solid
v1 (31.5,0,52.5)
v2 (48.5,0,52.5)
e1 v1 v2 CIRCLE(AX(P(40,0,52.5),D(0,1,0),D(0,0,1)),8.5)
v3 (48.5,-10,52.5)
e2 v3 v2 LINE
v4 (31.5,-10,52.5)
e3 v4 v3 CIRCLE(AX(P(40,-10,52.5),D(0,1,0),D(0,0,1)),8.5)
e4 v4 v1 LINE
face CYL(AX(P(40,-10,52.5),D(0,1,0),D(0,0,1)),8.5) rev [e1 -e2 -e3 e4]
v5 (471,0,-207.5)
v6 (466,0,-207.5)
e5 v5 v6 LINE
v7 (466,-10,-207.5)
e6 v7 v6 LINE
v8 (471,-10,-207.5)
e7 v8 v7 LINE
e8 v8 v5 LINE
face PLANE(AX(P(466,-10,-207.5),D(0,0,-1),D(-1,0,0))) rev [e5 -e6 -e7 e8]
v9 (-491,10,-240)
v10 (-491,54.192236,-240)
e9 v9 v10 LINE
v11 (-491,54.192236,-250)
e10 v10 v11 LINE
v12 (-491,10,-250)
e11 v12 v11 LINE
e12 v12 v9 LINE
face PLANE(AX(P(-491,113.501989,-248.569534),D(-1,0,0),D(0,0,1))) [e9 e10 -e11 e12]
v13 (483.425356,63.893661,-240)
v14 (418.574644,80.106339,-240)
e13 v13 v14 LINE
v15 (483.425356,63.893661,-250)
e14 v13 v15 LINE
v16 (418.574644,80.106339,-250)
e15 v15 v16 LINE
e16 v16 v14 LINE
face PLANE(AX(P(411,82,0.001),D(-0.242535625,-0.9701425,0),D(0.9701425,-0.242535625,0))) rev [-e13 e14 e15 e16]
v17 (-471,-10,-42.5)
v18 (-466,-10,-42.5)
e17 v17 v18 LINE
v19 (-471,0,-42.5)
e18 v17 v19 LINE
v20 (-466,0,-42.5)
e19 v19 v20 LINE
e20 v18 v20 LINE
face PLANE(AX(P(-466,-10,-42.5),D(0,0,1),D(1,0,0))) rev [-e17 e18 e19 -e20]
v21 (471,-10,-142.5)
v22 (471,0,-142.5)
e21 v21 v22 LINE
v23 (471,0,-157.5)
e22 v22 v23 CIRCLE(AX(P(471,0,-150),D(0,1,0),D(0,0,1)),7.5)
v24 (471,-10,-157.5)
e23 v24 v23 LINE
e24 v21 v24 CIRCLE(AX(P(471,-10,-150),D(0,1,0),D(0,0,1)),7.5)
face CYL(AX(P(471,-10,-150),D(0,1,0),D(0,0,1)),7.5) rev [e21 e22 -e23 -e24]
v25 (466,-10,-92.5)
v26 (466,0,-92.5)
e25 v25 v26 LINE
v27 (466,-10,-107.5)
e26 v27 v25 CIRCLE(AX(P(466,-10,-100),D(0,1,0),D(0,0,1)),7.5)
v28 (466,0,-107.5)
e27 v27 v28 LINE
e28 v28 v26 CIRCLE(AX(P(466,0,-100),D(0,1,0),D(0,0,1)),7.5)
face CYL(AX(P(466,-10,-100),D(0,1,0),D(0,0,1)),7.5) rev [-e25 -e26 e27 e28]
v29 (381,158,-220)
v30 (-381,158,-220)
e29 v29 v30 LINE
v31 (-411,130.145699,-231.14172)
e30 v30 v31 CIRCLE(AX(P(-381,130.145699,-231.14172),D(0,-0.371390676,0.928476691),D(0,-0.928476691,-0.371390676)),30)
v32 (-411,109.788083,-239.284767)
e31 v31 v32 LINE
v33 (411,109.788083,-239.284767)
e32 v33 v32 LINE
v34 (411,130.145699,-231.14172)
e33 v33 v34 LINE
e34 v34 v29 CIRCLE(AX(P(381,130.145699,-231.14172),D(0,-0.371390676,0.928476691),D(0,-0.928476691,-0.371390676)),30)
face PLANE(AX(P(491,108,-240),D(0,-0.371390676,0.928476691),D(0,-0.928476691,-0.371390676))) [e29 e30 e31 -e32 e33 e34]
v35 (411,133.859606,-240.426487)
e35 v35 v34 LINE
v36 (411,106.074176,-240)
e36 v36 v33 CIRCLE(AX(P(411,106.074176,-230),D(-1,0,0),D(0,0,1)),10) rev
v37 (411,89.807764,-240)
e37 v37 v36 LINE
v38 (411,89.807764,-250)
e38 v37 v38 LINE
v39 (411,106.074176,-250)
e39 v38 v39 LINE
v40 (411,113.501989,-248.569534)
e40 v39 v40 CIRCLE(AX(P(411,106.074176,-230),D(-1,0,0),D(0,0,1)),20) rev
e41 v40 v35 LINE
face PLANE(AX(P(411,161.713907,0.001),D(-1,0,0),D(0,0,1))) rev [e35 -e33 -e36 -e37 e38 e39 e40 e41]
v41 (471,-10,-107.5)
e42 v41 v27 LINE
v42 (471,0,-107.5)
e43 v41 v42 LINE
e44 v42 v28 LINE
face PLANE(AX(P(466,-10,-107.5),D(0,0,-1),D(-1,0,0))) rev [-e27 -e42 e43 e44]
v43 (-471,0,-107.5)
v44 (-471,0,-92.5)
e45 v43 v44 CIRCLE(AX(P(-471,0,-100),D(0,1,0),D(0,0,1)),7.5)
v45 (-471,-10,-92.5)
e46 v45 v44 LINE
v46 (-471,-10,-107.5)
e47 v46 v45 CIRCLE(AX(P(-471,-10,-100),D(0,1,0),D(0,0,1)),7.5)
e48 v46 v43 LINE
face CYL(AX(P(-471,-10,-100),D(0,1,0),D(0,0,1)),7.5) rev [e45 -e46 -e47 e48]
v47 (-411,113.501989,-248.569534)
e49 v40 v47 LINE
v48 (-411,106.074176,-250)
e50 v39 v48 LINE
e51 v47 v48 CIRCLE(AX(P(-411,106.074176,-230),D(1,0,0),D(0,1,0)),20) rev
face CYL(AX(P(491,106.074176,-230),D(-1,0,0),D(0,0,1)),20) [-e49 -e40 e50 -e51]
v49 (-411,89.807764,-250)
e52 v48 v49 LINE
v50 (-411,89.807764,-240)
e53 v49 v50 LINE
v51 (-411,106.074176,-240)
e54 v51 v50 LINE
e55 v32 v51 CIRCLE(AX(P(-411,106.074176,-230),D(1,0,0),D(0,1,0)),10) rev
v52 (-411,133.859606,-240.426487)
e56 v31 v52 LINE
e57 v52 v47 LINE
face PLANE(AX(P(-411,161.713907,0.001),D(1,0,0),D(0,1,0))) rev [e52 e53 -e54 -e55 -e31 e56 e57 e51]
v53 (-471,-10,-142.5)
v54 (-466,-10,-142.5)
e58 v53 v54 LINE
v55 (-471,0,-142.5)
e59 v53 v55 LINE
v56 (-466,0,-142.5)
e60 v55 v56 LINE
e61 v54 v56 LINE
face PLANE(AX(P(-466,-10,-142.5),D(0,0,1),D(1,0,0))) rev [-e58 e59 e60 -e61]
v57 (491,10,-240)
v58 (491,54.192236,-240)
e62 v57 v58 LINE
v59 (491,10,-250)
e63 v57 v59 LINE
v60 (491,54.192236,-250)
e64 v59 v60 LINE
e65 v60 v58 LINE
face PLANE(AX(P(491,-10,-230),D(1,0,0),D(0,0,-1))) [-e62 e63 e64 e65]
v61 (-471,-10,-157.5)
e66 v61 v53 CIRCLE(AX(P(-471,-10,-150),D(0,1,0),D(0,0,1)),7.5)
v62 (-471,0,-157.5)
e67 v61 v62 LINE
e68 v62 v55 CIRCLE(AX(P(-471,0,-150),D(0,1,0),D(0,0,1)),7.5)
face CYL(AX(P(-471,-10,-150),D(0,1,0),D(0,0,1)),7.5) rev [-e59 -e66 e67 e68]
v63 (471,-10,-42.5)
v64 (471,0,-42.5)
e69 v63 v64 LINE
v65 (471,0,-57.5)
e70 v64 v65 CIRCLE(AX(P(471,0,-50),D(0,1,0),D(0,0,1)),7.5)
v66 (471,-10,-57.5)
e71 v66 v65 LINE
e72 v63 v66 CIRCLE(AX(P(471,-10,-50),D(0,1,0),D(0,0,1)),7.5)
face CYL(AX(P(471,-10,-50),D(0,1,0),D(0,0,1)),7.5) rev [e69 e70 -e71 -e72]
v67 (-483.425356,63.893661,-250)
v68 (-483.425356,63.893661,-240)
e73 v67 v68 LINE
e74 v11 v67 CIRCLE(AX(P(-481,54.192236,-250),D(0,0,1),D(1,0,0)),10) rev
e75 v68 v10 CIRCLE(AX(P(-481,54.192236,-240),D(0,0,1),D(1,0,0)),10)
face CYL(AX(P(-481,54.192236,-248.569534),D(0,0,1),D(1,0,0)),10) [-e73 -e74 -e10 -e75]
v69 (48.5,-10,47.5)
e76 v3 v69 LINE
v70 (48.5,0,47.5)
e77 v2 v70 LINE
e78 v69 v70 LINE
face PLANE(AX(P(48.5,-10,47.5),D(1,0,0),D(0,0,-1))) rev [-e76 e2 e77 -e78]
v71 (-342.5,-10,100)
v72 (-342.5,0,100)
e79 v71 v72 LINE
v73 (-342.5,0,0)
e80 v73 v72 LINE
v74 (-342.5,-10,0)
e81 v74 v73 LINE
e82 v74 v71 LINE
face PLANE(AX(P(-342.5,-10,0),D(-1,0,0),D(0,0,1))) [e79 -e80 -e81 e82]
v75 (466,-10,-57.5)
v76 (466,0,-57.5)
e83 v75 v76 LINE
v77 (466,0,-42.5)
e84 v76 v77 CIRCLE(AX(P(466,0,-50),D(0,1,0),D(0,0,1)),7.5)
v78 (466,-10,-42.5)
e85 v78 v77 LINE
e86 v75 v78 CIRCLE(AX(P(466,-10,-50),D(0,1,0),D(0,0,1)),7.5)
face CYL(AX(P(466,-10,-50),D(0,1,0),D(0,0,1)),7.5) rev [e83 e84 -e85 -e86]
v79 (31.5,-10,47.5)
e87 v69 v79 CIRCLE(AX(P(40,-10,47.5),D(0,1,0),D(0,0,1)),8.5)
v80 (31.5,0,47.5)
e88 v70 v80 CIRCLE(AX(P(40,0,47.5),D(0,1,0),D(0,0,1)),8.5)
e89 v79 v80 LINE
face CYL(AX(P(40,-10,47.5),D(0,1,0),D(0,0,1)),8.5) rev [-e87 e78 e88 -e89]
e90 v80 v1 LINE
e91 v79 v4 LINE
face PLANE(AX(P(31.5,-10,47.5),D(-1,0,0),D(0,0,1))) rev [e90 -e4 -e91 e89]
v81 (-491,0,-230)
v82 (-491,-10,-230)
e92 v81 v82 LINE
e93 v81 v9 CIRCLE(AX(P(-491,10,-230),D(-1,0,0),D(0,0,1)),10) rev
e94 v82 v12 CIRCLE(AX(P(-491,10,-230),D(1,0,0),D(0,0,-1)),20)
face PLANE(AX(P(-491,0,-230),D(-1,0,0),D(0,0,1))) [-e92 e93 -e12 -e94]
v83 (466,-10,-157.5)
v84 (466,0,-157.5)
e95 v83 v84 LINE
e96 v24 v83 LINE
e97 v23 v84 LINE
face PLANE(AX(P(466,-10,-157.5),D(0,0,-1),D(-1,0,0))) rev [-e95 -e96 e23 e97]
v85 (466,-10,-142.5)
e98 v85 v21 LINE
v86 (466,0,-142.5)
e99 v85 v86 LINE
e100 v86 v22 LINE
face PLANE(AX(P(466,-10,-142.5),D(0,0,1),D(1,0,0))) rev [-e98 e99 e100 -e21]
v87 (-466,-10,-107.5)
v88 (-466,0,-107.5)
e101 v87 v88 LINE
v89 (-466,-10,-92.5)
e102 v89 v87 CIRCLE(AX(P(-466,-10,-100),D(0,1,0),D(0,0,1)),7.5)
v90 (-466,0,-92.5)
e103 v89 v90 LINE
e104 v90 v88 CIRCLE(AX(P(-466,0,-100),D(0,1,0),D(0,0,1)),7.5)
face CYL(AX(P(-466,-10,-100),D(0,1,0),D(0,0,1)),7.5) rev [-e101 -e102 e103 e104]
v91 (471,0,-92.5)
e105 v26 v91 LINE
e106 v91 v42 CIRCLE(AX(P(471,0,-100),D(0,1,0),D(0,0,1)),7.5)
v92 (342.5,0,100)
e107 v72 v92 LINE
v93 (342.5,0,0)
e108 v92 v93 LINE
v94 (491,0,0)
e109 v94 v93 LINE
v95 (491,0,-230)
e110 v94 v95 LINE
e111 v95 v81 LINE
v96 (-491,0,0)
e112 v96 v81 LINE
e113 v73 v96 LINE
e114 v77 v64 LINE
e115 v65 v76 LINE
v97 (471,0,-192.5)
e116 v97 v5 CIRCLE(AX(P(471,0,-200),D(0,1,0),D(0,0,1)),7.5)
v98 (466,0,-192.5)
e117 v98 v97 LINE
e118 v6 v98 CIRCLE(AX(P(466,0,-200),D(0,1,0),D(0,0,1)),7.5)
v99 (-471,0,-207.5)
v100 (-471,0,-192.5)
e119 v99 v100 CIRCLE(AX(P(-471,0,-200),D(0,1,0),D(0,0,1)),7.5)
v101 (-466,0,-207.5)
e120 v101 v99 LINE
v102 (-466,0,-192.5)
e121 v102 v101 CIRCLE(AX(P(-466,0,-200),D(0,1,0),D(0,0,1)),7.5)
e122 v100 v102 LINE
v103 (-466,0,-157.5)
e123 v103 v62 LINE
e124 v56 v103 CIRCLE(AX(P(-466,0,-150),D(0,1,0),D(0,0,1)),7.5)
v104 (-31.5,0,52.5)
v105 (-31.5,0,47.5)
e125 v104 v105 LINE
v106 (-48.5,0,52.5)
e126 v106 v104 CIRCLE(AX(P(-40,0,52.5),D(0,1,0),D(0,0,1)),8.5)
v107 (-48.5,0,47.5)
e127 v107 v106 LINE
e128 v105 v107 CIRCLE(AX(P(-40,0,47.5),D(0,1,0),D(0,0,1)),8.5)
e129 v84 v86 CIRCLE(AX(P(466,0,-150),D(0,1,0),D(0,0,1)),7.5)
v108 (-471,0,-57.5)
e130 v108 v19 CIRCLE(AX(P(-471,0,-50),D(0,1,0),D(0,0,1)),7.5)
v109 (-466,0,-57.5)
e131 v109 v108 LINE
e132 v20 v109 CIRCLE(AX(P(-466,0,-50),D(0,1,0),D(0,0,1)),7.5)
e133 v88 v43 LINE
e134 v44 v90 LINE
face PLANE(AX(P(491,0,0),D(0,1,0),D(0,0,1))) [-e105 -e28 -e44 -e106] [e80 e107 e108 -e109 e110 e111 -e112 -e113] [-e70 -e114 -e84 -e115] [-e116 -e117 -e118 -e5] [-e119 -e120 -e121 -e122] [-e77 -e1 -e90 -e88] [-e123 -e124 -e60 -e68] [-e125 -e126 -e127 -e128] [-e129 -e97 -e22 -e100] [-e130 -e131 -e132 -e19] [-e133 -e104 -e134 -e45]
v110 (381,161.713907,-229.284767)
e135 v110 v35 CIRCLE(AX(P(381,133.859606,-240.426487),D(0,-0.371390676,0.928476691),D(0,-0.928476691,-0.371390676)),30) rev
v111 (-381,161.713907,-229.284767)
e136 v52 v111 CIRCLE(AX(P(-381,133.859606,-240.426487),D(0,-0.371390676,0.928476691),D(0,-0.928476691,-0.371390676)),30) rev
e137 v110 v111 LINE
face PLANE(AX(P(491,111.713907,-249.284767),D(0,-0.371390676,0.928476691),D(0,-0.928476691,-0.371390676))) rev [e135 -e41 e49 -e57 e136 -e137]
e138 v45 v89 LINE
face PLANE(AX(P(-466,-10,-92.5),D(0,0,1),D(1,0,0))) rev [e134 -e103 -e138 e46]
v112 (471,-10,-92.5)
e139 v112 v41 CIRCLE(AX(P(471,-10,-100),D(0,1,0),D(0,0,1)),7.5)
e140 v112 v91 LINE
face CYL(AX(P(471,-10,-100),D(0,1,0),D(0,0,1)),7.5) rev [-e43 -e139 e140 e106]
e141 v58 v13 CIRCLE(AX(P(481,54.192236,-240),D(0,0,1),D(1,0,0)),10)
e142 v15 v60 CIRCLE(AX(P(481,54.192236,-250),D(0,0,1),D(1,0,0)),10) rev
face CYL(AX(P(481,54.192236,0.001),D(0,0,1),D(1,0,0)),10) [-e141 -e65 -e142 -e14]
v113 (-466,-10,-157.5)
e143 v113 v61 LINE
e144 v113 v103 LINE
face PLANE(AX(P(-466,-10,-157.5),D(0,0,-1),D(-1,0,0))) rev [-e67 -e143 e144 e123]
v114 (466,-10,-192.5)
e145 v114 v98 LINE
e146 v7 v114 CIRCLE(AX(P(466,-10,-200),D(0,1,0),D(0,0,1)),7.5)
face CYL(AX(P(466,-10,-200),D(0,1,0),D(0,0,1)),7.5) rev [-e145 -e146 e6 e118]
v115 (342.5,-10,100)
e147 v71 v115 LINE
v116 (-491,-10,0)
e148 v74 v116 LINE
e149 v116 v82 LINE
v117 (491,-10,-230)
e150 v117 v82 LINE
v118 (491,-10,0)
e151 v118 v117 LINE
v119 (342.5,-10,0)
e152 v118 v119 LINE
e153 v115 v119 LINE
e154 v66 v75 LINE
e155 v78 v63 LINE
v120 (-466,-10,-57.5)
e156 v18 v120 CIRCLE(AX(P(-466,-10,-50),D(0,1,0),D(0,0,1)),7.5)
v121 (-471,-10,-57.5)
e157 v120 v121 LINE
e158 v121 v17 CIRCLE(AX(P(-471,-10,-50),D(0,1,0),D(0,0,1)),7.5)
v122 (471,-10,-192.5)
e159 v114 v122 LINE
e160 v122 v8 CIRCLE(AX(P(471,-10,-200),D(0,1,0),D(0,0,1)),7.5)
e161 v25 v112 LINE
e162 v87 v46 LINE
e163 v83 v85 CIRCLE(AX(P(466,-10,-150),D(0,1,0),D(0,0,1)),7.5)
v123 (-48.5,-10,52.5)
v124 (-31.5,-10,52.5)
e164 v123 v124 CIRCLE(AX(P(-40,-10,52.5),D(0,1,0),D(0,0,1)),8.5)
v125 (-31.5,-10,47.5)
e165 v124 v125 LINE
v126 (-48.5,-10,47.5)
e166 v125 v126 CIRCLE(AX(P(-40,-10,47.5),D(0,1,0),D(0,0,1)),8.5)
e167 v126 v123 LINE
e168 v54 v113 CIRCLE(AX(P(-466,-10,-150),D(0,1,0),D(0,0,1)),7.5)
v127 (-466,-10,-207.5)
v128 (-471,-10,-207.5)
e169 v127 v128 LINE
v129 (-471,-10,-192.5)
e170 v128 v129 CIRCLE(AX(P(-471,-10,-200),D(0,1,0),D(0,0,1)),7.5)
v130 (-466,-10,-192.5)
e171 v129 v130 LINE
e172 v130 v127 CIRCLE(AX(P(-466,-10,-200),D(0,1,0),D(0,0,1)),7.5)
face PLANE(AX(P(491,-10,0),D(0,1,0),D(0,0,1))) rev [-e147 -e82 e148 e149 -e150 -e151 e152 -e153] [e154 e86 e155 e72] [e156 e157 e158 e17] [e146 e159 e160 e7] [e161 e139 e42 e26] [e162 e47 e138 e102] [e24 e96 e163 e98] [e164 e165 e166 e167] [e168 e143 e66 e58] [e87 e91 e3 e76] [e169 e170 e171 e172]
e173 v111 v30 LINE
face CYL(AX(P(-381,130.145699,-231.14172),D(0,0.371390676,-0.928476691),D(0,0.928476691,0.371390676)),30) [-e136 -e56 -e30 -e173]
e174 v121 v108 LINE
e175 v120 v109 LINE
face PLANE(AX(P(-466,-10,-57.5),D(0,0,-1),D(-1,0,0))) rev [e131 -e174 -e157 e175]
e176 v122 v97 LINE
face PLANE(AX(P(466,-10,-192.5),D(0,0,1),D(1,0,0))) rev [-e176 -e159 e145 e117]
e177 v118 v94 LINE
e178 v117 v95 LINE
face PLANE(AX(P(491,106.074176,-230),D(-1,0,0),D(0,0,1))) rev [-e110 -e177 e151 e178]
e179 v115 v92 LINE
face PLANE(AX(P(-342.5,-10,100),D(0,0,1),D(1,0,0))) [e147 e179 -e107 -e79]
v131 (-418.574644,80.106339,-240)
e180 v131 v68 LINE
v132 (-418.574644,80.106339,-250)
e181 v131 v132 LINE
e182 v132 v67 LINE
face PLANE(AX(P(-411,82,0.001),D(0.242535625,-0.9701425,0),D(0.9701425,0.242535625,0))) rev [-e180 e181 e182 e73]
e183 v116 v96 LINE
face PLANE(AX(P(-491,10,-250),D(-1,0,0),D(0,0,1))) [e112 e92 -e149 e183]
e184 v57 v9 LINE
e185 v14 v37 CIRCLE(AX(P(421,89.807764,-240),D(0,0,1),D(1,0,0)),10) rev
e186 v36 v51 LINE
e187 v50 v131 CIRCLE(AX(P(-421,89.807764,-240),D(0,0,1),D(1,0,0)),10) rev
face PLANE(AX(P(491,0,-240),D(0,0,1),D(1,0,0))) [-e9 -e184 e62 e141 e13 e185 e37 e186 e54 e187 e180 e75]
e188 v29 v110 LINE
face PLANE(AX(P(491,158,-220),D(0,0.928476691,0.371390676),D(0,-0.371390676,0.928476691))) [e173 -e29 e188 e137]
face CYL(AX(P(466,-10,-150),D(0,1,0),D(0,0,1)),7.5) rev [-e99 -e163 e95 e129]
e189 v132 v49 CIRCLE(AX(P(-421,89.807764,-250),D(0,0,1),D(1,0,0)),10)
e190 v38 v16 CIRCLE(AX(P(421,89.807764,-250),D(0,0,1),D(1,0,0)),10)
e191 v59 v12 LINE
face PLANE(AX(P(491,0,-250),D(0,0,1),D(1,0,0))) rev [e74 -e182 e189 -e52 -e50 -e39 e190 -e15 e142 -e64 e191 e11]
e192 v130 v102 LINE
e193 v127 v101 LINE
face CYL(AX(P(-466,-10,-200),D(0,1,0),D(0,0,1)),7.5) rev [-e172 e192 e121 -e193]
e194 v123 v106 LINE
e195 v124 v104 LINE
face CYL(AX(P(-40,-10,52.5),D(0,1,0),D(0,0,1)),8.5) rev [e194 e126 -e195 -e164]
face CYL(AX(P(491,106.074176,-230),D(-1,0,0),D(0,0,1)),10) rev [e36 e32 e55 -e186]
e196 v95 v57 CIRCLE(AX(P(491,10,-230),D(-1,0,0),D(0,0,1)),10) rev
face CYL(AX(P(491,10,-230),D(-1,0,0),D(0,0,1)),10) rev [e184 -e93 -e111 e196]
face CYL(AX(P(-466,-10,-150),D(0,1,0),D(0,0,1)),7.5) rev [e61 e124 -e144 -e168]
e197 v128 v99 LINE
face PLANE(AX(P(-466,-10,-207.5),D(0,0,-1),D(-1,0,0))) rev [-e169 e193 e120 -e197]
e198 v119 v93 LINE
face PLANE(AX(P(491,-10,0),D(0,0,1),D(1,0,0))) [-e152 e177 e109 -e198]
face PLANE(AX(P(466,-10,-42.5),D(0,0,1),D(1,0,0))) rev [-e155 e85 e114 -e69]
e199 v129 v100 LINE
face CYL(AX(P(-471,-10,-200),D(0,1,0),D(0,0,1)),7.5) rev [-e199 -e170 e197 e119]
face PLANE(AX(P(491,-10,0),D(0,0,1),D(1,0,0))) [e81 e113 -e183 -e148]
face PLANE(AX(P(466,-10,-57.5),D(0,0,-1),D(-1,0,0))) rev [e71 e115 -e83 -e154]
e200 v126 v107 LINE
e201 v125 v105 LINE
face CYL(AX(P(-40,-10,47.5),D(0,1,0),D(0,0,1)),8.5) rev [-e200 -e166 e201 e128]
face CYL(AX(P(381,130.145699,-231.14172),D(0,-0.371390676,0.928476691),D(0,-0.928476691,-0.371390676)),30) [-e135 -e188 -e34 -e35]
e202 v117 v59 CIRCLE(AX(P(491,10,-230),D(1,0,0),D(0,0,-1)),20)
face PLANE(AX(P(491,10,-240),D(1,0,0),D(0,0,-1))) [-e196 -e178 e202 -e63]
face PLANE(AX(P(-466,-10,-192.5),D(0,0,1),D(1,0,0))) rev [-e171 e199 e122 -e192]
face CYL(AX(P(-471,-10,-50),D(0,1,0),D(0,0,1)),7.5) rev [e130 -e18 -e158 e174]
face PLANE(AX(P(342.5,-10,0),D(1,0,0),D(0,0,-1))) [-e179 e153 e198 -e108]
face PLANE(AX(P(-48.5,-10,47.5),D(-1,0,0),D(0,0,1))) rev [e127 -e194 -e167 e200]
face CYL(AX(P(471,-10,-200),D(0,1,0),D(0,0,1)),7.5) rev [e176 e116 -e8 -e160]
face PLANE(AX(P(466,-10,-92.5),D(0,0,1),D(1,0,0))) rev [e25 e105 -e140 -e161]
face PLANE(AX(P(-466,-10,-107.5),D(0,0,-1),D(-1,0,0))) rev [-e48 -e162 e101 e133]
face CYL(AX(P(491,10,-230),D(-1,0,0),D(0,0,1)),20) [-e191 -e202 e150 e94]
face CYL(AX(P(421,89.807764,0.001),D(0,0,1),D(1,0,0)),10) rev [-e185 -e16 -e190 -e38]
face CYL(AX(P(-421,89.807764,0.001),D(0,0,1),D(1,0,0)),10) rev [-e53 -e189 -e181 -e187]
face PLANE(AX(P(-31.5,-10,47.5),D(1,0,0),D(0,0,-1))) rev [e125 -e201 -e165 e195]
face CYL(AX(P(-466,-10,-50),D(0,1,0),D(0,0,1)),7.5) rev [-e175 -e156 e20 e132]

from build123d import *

# Parameters (mm, degrees)
SM_BASE_FLANGE_1_DEPTH = 491
CUT_EXTRUDE_1_REACH    = 576.223
CUT_EXTRUDE_2_DEPTH    = 575.223290751
PATTERN_LINEAR_1_COUNT = 4
PATTERN_LINEAR_1_PITCH = 50
FILLET_1_R             = 30
SKETCH_4_W             = 685
SKETCH_4_H             = 100
EXTRUDE_1_DEPTH        = 10
CUT_EXTRUDE_3_DEPTH    = 10
FILLET_2_R             = 10


# Sheet-metal steps are written as plain solids
with BuildPart() as part:
    # Sketch 1 → 基体-法兰1 (new, symmetric)
    with BuildSketch(Plane(origin=(0, 0, 0), x_dir=(0, 0, -1), z_dir=(1, 0, 0))):
        with BuildLine():
            Line((0, 0), (230, 0))
            ThreePointArc((230, 0), (237.071067812, 2.928932188), (240, 10))
            Line((240, 10), (240, 106.074175964))
            ThreePointArc((240, 106.074175964), (239.819563867, 107.965251176), (239.284766909, 109.788082728))
            Line((239.284766909, 109.788082728), (220, 158))
            Line((220, 158), (229.284766909, 161.713906764))
            Line((229.284766909, 161.713906764), (248.569533818, 113.501989491))
            ThreePointArc((248.569533818, 113.501989491), (249.639127735, 109.856326387), (250, 106.074175964))
            Line((250, 106.074175964), (250, 10))
            ThreePointArc((250, 10), (244.142135624, -4.142135624), (230, -10))
            Line((230, -10), (0, -10))
            Line((0, -10), (0, 0))
        make_face()
    extrude(amount=SM_BASE_FLANGE_1_DEPTH, both=True)

    # Sketch 2 → 切除-拉伸1 (cut, up to next)
    with BuildSketch(Plane(origin=(0, 0, -250), x_dir=(-1, 0, 0), z_dir=(0, 0, -1)), mode=Mode.PRIVATE) as cut_extrude_1_sk1:
        Polygon((-411, 161.713906764), (-411, 82), (-491, 62), (-491, 161.713906764), align=None)
    cut_extrude_1_tool1 = extrude(cut_extrude_1_sk1.sketch, amount=-CUT_EXTRUDE_1_REACH, mode=Mode.PRIVATE) & part.part
    # Sketch 2 → 切除-拉伸1 (cut, up to next)
    with BuildSketch(Plane(origin=(0, 0, -250), x_dir=(-1, 0, 0), z_dir=(0, 0, -1)), mode=Mode.PRIVATE) as cut_extrude_1_sk2:
        Polygon((491, 161.713906764), (411, 161.713906764), (411, 82), (491, 62), align=None)
    cut_extrude_1_tool2 = extrude(cut_extrude_1_sk2.sketch, amount=-CUT_EXTRUDE_1_REACH, mode=Mode.PRIVATE) & part.part
    add(cut_extrude_1_tool1.solids().sort_by_distance((452.486206, 116.671178, -250))[0], mode=Mode.SUBTRACT)
    add(cut_extrude_1_tool2.solids().sort_by_distance((-452.486206, 116.671178, -250))[0], mode=Mode.SUBTRACT)

    # 草图3 → 切除-拉伸2 (cut, through all)
    with BuildSketch(Plane(origin=(0, 0, 0), x_dir=(1, 0, 0), z_dir=(0, 1, 0))):
        with BuildLine():
            Line((466, 57.5), (471, 57.5))
            ThreePointArc((471, 57.5), (478.5, 50), (471, 42.5))
            Line((471, 42.5), (466, 42.5))
            ThreePointArc((466, 42.5), (458.5, 50), (466, 57.5))
        make_face()
        with BuildLine():
            Line((-466, 42.5), (-471, 42.5))
            ThreePointArc((-471, 42.5), (-478.5, 50), (-471, 57.5))
            Line((-471, 57.5), (-466, 57.5))
            ThreePointArc((-466, 57.5), (-458.5, 50), (-466, 42.5))
        make_face()
    cut_extrude_2 = extrude(amount=-CUT_EXTRUDE_2_DEPTH, mode=Mode.SUBTRACT)

    # 阵列(线性)1: 切除-拉伸2 ×4
    with Locations(*[(0, 0, -i * PATTERN_LINEAR_1_PITCH) for i in range(1, PATTERN_LINEAR_1_COUNT)]):
        add(cut_extrude_2, mode=Mode.SUBTRACT)

    # 圆角1
    fillet_1_edges = [part.edges().sort_by_distance(p)[0] for p in [
        (411, 159.856953382, -224.642383454),
        (-411, 159.856953382, -224.642383454),
    ]]
    fillet(fillet_1_edges, radius=FILLET_1_R)

    # 草图4 → 凸台-拉伸1 (add)
    with BuildSketch(Plane(origin=(0, 0, 0), x_dir=(1, 0, 0), z_dir=(0, 1, 0))):
        with Locations((0, -50)):
            Rectangle(SKETCH_4_W, SKETCH_4_H)
    extrude(amount=-EXTRUDE_1_DEPTH)

    # 草图5 → 切除-拉伸3 (cut)
    with BuildSketch(Plane(origin=(0, 0, 0), x_dir=(1, 0, 0), z_dir=(0, 1, 0))):
        with BuildLine():
            Line((-31.5, -47.5), (-31.5, -52.5))
            ThreePointArc((-31.5, -52.5), (-40, -61), (-48.5, -52.5))
            Line((-48.5, -52.5), (-48.5, -47.5))
            ThreePointArc((-48.5, -47.5), (-40, -39), (-31.5, -47.5))
        make_face()
        with BuildLine():
            Line((48.5, -47.5), (48.5, -52.5))
            ThreePointArc((48.5, -52.5), (40, -61), (31.5, -52.5))
            Line((31.5, -52.5), (31.5, -47.5))
            ThreePointArc((31.5, -47.5), (40, -39), (48.5, -47.5))
        make_face()
    extrude(amount=-CUT_EXTRUDE_3_DEPTH, mode=Mode.SUBTRACT)

    # 圆角2
    fillet_2_edges = [part.edges().sort_by_distance(p)[0] for p in [
        (491, 62, -245),
        (411, 82, -245),
        (-411, 82, -245),
        (-491, 62, -245),
    ]]
    fillet(fillet_2_edges, radius=FILLET_2_R)


solid = part.part
